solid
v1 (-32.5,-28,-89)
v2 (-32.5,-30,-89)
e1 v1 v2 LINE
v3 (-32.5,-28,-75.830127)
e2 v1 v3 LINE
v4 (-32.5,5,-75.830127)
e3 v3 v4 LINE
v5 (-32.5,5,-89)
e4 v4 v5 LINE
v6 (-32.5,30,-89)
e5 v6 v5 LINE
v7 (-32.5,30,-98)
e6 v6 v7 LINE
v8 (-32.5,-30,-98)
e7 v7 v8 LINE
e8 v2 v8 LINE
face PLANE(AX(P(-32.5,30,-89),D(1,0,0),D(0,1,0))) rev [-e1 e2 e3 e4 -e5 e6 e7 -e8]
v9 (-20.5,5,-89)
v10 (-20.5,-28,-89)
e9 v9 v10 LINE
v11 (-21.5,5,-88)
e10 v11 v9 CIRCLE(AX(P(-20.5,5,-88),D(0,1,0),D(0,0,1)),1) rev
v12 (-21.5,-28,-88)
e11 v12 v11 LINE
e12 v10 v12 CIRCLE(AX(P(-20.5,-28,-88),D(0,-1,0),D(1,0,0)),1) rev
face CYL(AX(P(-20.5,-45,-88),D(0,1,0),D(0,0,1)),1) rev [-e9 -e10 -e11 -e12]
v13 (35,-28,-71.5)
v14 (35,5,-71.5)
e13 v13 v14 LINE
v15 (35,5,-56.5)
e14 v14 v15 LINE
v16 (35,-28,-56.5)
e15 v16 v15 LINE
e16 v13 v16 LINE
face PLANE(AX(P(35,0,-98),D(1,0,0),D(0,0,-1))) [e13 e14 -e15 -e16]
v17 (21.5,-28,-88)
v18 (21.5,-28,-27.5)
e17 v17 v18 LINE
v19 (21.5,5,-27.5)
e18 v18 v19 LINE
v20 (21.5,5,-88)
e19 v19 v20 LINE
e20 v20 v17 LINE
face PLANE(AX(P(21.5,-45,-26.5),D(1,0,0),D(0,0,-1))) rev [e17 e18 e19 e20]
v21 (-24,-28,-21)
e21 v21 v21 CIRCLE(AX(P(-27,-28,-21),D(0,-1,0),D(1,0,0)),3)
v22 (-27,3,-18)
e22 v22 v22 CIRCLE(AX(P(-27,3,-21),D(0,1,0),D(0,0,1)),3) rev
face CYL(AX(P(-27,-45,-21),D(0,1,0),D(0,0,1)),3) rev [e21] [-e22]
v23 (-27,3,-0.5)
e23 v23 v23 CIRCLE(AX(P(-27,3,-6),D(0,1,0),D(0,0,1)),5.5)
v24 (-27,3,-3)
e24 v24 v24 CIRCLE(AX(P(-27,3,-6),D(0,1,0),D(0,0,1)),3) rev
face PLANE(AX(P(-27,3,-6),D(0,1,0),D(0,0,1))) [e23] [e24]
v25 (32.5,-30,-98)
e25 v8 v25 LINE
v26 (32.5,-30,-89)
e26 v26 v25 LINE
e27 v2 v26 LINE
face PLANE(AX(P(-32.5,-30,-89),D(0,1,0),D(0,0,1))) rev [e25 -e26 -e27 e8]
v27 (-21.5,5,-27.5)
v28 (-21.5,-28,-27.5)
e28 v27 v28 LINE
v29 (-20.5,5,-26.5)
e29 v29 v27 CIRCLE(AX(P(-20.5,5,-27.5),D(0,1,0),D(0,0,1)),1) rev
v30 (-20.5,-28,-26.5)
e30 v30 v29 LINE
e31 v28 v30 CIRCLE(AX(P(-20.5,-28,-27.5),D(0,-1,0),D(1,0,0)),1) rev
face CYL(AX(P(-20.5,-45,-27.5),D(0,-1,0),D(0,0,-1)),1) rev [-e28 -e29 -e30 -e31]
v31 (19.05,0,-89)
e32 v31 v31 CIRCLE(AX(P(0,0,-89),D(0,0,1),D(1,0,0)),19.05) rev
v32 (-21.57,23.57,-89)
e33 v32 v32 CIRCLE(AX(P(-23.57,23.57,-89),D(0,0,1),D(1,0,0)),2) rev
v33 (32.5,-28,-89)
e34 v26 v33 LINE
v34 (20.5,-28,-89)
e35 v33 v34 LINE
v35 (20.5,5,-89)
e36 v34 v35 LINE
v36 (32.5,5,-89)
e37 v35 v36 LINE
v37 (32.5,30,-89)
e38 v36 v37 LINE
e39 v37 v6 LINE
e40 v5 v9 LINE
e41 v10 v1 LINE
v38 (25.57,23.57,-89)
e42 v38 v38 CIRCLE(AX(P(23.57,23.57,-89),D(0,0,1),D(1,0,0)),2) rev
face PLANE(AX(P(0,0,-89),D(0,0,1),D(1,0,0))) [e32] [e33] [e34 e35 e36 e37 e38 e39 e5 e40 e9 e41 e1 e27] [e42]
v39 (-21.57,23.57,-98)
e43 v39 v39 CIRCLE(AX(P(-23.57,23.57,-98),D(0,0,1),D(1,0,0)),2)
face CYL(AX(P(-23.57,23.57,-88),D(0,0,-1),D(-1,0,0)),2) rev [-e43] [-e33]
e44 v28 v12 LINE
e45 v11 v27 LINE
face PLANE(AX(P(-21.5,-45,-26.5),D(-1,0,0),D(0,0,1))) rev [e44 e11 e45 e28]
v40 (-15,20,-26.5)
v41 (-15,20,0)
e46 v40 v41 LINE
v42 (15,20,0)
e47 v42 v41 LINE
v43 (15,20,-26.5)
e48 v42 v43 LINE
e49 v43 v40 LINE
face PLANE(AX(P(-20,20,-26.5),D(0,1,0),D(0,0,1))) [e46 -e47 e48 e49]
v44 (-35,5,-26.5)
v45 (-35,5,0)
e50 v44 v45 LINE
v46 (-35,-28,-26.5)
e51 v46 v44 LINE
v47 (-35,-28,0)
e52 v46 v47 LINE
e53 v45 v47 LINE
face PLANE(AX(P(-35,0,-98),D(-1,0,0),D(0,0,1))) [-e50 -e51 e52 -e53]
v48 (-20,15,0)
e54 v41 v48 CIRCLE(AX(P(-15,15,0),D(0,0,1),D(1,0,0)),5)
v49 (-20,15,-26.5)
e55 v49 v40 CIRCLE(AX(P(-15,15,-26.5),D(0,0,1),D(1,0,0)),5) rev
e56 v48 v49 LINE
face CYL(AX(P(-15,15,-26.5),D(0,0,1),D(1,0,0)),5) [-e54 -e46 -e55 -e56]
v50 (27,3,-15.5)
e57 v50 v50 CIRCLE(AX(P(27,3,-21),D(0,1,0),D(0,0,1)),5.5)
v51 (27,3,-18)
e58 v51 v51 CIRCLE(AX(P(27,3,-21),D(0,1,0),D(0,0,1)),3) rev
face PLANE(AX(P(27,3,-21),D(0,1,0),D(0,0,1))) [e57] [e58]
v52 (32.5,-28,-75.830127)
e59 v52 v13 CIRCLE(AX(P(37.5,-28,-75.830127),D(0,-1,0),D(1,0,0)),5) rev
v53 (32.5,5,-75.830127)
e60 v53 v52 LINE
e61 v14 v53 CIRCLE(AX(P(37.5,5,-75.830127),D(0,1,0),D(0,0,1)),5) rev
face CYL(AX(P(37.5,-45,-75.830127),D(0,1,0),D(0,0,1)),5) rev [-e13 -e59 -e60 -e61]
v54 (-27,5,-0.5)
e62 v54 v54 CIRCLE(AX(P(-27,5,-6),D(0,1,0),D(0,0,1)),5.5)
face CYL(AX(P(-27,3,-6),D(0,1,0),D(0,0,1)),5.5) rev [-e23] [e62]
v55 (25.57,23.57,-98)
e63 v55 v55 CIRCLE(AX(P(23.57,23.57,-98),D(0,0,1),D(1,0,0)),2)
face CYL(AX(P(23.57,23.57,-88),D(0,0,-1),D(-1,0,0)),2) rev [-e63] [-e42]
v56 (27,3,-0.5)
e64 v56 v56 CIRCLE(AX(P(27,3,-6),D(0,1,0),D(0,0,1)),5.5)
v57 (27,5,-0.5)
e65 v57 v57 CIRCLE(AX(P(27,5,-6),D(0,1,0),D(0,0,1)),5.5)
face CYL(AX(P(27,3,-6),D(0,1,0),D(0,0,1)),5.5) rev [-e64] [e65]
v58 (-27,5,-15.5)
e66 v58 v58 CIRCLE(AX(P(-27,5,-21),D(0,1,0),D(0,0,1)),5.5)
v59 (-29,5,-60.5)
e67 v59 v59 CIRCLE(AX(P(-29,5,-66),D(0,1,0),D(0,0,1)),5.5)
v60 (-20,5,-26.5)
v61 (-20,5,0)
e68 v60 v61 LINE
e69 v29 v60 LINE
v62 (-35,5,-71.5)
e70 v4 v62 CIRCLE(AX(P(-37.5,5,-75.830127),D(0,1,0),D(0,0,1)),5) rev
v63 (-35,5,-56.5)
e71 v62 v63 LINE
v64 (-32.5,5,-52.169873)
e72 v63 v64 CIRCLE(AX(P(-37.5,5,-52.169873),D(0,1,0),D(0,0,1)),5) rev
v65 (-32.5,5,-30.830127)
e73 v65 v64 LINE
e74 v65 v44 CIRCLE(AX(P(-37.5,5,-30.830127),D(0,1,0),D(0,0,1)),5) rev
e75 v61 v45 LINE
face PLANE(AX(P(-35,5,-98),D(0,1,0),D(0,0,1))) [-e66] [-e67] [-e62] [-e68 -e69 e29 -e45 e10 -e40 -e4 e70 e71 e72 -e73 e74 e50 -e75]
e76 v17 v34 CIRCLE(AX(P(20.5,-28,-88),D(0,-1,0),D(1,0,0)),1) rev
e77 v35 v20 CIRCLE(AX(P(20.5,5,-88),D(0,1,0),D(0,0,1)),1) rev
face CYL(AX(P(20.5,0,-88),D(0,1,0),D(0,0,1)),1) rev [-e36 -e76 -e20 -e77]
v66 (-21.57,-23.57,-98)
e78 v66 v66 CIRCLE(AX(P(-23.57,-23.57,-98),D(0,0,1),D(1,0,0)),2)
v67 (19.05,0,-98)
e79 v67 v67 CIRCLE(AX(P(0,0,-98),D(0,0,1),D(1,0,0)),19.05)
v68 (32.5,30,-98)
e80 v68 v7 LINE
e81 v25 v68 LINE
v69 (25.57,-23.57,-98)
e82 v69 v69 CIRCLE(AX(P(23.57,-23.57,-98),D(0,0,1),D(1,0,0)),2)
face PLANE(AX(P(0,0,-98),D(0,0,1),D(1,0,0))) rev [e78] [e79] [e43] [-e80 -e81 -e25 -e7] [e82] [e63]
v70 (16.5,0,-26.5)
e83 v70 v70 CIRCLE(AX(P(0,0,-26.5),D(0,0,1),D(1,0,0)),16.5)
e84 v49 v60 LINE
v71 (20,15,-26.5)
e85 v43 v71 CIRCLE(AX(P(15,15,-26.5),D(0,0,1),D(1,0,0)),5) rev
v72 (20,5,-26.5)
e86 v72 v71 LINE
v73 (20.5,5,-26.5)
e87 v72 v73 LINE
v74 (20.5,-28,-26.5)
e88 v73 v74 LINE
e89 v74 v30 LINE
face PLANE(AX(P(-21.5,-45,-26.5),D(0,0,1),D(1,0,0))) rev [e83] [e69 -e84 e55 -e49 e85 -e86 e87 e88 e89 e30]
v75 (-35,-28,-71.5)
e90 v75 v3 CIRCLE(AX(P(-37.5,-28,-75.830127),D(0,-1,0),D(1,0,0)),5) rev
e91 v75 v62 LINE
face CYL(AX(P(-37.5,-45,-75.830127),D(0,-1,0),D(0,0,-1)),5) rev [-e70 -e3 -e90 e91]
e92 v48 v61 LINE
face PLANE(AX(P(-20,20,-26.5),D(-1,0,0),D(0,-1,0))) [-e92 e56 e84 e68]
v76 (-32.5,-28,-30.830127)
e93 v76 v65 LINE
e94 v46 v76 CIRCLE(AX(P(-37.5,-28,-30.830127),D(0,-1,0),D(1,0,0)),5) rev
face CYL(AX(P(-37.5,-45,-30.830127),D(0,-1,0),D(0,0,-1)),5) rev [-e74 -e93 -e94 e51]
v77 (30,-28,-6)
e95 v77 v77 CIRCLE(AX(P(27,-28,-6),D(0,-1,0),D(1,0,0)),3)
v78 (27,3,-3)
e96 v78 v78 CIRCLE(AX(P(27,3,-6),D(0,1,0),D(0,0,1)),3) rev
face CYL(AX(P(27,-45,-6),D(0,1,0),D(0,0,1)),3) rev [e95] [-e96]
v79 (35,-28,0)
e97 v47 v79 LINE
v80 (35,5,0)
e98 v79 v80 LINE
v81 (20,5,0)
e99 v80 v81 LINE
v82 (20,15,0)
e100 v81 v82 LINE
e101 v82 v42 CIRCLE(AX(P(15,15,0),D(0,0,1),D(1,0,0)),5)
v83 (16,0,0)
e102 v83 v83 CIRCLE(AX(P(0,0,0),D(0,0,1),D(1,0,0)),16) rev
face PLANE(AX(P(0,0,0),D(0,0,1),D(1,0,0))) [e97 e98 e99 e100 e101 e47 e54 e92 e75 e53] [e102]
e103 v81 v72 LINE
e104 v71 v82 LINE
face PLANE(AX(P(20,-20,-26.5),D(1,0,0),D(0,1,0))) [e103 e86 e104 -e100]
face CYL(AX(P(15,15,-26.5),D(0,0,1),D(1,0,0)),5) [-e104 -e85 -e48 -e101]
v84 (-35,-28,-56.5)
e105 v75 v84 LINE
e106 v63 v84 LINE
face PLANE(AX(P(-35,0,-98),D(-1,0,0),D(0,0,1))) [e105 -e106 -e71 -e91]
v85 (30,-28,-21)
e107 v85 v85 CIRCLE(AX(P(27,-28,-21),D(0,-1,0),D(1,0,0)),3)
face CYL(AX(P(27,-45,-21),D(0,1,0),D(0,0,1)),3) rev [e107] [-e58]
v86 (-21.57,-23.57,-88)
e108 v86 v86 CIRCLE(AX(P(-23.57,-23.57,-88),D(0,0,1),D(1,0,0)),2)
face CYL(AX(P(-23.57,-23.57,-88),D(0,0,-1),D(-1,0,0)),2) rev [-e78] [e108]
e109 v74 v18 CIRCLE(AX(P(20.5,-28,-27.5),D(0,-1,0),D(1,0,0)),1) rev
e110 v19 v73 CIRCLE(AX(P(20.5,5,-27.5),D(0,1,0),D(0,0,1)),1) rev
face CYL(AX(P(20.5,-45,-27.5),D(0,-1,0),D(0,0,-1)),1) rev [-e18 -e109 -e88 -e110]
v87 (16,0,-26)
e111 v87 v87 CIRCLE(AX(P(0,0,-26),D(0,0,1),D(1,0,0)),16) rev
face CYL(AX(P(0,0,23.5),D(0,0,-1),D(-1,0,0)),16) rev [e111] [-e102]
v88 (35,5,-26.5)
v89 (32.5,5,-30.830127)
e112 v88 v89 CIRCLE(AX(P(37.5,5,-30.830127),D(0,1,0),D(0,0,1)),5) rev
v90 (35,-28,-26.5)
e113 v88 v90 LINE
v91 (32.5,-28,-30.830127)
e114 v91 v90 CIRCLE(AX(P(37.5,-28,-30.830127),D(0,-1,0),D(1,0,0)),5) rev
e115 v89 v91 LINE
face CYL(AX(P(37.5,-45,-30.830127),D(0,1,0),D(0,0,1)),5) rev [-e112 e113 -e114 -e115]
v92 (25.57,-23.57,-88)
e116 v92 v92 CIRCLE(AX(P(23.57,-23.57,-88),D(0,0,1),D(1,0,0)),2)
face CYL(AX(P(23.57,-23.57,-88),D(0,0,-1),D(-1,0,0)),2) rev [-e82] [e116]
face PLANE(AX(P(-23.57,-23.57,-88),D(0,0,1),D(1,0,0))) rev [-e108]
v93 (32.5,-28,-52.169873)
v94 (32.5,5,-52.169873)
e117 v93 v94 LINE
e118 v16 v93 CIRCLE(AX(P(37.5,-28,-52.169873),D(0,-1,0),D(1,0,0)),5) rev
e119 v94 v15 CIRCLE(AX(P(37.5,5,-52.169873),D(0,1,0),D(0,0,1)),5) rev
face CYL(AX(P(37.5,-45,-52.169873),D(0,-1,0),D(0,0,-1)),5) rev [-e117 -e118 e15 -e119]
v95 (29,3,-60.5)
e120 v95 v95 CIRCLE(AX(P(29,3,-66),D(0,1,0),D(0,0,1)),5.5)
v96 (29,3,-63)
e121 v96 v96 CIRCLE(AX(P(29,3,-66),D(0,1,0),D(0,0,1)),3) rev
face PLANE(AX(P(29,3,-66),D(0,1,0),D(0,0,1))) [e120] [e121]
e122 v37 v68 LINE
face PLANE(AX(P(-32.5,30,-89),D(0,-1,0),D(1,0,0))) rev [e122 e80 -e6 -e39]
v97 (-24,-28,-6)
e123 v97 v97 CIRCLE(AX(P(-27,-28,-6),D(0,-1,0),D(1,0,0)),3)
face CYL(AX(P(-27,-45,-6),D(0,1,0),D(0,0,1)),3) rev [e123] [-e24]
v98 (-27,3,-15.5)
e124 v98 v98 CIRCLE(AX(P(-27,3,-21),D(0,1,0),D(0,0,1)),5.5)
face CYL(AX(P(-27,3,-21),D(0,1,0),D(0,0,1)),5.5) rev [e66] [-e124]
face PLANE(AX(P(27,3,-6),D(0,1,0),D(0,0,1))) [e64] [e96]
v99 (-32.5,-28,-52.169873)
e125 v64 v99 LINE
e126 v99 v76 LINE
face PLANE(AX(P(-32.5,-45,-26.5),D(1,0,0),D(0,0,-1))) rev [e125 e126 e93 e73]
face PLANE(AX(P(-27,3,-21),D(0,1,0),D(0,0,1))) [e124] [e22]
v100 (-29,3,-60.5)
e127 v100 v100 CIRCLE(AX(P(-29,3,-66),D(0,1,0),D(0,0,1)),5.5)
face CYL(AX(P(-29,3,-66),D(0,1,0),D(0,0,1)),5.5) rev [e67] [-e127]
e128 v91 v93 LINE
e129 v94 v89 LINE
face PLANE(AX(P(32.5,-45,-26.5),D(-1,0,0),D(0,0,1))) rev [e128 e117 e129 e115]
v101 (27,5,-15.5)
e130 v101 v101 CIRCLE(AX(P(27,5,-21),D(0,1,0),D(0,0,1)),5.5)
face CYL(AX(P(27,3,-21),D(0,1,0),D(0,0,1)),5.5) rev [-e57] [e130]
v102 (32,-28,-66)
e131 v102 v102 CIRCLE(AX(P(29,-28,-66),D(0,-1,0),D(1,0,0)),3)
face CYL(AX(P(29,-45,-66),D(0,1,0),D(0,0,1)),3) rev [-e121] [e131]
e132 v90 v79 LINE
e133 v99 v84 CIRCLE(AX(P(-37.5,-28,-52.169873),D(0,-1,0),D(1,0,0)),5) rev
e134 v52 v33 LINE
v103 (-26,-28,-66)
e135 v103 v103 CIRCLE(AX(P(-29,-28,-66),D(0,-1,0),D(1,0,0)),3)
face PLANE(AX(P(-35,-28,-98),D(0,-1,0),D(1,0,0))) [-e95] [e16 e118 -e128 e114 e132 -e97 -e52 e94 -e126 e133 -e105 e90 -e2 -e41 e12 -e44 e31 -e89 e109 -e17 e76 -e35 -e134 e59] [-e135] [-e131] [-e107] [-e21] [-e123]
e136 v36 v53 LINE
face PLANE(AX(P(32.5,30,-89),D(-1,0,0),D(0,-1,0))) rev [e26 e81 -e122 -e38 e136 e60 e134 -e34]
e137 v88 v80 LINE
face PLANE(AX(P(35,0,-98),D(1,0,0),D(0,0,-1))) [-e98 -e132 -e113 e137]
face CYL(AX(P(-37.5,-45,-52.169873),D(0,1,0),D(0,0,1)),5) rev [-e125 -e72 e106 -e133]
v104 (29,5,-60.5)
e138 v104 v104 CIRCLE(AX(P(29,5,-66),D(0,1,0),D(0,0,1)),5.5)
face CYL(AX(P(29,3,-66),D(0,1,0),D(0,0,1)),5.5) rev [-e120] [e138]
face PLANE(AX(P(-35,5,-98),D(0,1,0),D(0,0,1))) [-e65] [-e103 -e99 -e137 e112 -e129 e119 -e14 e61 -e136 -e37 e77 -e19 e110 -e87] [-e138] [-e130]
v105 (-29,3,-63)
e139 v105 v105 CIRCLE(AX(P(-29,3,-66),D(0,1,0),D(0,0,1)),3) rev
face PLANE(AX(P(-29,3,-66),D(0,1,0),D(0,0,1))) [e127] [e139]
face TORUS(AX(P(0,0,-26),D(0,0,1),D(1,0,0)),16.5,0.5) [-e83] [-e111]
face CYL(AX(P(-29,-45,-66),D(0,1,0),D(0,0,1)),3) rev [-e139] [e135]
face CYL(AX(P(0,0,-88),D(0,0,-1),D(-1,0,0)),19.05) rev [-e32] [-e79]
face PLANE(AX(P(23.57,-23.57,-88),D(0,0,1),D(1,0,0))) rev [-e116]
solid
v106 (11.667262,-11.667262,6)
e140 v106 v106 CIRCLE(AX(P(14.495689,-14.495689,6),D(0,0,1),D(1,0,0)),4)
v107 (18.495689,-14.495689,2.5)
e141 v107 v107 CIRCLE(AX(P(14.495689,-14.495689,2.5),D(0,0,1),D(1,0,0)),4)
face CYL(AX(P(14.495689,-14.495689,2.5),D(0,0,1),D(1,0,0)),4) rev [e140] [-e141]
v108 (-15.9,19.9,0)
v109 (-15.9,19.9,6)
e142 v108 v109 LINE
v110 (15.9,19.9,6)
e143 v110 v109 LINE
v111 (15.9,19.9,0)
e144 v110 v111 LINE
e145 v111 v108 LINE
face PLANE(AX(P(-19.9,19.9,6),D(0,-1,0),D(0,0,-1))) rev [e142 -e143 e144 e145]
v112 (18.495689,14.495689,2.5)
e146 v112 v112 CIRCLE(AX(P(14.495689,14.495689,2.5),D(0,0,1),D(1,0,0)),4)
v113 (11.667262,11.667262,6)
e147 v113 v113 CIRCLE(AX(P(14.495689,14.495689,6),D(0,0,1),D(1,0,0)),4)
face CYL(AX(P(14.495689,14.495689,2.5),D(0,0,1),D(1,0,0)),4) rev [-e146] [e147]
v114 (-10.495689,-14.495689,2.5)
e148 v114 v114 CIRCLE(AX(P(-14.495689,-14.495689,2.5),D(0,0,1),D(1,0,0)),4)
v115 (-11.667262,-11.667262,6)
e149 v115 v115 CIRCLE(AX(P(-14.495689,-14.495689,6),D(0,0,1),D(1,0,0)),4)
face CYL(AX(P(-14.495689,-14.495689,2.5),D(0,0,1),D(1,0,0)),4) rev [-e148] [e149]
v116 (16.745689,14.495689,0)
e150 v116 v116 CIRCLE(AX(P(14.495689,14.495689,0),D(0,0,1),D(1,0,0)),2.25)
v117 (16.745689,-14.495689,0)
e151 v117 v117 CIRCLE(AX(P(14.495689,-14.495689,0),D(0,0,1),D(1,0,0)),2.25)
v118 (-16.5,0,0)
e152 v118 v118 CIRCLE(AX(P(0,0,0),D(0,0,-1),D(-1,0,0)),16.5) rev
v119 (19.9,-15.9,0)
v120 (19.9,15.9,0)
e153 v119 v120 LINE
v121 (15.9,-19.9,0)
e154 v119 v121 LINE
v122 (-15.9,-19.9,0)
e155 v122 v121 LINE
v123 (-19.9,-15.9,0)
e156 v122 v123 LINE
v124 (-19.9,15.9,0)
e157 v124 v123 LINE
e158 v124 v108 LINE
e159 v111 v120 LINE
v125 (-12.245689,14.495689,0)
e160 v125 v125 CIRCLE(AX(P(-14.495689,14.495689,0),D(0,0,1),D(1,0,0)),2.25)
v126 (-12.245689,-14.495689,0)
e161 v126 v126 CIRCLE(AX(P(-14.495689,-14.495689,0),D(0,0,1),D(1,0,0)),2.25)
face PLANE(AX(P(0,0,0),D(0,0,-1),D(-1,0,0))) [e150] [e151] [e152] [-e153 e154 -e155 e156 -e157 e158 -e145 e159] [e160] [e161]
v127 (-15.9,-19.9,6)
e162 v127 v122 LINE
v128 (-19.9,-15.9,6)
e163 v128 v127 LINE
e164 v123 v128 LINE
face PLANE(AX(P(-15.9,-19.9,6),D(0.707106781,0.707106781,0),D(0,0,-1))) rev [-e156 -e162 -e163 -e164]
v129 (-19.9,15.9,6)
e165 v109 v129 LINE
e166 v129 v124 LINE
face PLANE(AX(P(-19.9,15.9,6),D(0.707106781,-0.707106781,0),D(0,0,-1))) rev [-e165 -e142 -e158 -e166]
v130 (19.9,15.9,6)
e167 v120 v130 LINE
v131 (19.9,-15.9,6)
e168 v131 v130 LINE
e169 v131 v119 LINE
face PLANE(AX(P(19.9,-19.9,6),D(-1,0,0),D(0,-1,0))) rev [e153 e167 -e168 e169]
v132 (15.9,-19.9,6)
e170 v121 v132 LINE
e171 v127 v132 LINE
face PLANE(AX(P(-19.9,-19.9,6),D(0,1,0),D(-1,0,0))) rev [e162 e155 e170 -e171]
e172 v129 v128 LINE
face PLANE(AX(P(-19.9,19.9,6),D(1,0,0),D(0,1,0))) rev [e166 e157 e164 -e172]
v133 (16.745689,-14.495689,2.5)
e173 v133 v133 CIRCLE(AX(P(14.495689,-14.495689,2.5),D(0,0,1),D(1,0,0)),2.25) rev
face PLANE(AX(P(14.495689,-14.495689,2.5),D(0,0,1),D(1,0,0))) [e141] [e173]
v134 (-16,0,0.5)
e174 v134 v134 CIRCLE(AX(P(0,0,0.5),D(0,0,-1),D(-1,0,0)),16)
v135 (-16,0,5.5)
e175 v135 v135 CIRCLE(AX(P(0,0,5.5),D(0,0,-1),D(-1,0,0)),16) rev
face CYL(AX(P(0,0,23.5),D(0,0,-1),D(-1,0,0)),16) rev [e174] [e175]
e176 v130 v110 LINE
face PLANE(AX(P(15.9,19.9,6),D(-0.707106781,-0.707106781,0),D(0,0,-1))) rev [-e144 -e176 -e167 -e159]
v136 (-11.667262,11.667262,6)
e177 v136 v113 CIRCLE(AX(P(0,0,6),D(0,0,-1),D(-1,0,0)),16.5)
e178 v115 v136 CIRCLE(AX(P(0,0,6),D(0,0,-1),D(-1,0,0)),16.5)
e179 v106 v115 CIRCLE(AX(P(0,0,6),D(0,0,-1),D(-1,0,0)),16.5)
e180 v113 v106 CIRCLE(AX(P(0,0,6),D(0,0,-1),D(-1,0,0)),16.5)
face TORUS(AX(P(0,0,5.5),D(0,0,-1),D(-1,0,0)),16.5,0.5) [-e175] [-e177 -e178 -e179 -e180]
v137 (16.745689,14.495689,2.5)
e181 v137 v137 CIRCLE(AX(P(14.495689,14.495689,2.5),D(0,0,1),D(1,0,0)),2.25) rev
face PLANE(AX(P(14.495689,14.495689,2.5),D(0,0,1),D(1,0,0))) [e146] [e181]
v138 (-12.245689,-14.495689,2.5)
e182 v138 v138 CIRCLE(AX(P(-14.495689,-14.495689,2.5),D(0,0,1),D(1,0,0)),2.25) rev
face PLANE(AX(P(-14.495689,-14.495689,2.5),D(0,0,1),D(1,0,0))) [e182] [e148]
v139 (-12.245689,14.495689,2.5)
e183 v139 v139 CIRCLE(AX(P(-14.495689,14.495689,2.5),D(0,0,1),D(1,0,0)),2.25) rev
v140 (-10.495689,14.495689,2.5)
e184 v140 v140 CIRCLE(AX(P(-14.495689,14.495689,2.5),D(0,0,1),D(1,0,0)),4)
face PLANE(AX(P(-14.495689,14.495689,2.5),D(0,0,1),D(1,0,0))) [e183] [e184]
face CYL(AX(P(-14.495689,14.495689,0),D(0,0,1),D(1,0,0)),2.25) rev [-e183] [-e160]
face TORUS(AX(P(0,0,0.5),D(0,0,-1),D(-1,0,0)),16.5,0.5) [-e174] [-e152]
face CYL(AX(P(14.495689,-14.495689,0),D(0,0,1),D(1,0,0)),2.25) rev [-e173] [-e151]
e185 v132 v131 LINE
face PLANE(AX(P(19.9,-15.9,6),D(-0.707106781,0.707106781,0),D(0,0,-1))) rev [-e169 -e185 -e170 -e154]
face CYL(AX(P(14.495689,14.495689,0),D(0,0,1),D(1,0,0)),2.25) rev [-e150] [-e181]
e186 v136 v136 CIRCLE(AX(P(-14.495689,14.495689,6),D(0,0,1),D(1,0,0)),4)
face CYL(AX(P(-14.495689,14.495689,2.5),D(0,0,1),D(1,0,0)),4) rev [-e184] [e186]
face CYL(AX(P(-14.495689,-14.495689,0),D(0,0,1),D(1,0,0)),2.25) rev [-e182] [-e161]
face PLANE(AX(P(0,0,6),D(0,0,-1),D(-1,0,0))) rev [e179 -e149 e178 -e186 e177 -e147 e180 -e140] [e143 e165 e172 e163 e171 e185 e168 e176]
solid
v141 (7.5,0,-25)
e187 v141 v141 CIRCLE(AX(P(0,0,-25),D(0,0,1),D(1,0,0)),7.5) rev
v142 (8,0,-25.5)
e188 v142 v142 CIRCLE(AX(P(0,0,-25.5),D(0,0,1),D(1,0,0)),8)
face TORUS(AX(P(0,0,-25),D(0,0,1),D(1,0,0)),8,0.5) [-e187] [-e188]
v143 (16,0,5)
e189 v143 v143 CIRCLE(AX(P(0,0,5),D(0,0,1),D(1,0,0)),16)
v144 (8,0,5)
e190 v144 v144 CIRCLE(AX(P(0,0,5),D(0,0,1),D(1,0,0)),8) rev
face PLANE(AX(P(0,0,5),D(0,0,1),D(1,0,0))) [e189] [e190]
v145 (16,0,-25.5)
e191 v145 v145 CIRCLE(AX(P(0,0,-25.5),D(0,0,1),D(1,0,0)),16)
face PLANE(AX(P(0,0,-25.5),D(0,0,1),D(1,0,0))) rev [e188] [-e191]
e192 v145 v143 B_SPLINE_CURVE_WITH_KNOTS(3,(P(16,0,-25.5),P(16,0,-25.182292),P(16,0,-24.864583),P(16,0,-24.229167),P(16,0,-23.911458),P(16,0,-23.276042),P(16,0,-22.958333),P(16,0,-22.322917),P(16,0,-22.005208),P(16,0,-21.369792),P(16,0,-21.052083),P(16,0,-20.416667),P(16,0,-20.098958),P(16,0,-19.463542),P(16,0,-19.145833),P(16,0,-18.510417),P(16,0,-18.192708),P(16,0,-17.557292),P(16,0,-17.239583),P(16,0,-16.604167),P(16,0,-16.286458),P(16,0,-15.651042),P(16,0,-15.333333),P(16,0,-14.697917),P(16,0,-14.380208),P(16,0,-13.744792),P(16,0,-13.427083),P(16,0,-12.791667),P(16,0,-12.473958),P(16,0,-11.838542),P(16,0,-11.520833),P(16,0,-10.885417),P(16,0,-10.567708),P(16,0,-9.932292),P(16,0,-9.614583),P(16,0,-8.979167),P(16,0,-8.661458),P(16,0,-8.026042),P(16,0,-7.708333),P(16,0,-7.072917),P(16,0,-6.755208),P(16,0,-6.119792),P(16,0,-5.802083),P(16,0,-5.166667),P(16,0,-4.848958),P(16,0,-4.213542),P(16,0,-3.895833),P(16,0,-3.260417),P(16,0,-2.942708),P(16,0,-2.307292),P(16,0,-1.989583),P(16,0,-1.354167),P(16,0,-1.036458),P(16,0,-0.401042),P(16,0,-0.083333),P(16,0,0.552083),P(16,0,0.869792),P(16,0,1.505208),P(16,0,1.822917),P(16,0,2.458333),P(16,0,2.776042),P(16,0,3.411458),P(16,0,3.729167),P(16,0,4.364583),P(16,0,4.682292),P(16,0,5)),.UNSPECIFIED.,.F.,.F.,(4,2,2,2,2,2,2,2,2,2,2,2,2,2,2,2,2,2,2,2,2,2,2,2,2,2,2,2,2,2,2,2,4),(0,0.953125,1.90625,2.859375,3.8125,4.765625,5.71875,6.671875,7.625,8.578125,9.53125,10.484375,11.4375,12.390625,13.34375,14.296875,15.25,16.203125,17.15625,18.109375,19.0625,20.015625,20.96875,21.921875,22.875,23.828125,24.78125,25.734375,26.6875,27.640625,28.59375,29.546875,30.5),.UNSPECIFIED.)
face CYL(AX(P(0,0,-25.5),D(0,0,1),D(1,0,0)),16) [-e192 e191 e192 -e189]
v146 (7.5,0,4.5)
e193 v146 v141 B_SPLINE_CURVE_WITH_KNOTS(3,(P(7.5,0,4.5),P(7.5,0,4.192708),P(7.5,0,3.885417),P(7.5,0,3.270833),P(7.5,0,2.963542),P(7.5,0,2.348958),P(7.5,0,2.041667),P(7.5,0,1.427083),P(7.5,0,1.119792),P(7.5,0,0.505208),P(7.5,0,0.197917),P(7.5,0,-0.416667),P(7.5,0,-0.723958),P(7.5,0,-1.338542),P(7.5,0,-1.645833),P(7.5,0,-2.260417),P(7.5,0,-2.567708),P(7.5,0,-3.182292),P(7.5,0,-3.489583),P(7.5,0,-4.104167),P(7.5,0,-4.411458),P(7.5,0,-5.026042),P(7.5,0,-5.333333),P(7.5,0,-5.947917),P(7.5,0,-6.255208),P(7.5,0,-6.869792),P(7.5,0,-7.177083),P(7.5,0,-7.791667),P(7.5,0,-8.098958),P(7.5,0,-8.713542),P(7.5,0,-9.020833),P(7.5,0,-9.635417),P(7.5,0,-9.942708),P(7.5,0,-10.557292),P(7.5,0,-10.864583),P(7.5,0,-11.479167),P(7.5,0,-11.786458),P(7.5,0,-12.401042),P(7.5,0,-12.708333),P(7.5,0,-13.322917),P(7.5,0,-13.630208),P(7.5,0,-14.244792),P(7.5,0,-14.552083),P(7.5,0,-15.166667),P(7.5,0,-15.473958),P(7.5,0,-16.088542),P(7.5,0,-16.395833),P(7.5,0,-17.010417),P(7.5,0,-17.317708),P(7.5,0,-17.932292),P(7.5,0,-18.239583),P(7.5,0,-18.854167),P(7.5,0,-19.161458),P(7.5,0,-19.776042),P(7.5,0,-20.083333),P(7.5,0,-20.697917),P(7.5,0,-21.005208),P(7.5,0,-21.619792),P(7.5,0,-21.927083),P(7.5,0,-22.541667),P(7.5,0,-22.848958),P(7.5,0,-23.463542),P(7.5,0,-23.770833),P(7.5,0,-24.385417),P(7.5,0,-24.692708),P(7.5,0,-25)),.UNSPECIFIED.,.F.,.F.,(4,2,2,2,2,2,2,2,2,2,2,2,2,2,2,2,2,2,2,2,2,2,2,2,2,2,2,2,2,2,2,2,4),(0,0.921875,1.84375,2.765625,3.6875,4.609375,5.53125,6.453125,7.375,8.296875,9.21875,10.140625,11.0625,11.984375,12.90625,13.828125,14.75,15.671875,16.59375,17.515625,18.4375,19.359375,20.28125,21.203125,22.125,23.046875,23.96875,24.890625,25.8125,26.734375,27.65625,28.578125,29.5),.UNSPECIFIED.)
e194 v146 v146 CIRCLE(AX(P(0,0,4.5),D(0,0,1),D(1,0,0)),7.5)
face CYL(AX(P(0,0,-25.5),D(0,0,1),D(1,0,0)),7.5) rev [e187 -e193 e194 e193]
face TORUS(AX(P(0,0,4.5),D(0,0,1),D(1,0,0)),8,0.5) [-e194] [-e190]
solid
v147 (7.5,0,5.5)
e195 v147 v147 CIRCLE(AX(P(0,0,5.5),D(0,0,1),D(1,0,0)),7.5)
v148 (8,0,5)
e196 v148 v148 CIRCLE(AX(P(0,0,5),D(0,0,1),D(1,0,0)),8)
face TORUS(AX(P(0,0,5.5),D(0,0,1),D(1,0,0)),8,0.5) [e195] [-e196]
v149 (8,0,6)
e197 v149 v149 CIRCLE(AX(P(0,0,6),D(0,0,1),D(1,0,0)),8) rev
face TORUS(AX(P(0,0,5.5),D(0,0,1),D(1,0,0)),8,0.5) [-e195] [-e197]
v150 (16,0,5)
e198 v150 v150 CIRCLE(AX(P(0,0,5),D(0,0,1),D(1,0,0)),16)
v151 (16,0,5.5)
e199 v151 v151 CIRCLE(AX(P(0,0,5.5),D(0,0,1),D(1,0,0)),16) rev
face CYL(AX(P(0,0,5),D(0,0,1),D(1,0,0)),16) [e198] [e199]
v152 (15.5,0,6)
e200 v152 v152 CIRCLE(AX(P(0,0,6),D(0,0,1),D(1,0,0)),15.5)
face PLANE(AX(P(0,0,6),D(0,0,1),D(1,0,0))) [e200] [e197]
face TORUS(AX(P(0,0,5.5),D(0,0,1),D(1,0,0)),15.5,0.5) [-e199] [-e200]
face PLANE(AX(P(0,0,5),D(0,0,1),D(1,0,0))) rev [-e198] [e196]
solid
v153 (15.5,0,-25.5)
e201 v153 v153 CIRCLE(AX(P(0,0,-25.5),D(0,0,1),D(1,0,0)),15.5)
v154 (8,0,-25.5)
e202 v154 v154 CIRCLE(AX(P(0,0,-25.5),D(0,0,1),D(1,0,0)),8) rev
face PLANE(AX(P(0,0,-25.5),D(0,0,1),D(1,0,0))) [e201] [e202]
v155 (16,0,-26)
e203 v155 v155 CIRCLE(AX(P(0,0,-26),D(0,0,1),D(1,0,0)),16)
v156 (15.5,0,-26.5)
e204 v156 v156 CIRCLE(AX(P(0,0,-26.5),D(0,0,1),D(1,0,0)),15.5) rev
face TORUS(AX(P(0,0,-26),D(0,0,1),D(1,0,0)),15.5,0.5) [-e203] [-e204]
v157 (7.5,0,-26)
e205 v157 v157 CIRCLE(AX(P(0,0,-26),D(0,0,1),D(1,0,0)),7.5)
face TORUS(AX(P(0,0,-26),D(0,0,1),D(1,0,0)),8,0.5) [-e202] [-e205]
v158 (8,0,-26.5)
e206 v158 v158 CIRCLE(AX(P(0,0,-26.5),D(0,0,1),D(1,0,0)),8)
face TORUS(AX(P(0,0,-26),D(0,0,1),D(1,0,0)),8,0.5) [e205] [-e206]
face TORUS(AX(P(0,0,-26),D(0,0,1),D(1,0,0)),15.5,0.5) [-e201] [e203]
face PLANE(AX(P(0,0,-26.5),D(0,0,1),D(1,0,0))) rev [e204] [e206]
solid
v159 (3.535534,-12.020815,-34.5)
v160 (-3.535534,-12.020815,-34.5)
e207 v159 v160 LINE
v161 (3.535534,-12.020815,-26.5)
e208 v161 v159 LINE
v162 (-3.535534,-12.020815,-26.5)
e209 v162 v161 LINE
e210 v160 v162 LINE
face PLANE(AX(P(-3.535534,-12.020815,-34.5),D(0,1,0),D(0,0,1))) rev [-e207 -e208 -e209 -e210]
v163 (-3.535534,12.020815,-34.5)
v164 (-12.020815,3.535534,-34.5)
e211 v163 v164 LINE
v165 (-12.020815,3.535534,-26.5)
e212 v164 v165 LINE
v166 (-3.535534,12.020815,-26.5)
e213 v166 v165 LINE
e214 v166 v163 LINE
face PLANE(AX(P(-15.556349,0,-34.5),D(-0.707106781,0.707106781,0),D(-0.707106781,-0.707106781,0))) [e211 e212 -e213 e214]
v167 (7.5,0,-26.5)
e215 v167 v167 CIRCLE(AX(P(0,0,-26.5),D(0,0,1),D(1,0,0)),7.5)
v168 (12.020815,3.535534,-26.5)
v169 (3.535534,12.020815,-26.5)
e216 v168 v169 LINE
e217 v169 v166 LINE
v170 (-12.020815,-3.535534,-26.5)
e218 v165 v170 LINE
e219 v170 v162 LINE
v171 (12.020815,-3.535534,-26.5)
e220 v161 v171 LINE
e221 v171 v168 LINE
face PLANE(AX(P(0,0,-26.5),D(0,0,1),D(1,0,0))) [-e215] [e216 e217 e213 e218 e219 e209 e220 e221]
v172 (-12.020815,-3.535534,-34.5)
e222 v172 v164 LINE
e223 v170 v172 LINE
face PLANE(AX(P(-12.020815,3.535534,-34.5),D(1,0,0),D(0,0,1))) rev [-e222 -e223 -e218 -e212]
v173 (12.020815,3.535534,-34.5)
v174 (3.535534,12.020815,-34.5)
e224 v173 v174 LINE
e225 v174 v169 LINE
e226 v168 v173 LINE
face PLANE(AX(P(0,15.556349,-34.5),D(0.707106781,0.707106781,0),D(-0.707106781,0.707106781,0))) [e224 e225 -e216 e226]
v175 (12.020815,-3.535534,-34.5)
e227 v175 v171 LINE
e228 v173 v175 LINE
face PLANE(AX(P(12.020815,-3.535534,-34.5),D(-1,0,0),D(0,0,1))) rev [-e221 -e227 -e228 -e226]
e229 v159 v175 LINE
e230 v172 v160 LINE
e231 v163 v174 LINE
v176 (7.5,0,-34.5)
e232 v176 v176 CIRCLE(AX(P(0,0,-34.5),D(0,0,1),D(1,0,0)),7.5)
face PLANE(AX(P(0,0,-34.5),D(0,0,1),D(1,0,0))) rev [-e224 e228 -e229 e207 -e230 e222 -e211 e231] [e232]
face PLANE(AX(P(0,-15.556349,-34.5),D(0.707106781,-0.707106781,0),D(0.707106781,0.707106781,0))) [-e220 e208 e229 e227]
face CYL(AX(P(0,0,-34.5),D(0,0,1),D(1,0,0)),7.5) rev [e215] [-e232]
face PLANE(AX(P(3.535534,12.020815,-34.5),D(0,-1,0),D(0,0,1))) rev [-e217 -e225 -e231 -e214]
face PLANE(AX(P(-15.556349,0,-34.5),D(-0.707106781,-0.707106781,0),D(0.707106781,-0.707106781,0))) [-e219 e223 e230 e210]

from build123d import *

# Parameters (mm, degrees)
BOSS_EXTRUDE1_DEPTH = 98
SKETCH2_R           = 3
CUT_EXTRUDE1_DEPTH  = 50
SKETCH3_R           = 5.5
CUT_EXTRUDE3_DEPTH  = 2
SKETCH4_W           = 65
SKETCH4_H           = 60
BOSS_EXTRUDE3_DEPTH = 9
SKETCH5_W           = 43
SKETCH5_H           = 62.5
CUT_EXTRUDE4_DEPTH  = 50
SKETCH6_W           = 40
SKETCH6_H           = 40
BOSS_EXTRUDE4_DEPTH = 26.5
SKETCH7_W           = 2.5
SKETCH7_H           = 26.5
SKETCH7_H_2         = 30
CUT_EXTRUDE5_DEPTH  = 50
FILLET1_R           = 5
SKETCH8_R           = 19.05
CUT_EXTRUDE6_DEPTH  = 10
SKETCH9_W           = 39.8
SKETCH9_H           = 39.8
BOSS_EXTRUDE5_DEPTH = 6
SKETCH10_R          = 16
CUT_EXTRUDE7_DEPTH  = 50
FILLET2_R           = 1
FILLET4_R           = 0.5
SKETCH11_R          = 16
SKETCH11_R_2        = 7.5
BOSS_EXTRUDE6_DEPTH = 1
SKETCH12_R          = 16
SKETCH12_R_2        = 7.5
BOSS_EXTRUDE7_DEPTH = 1
FILLET5_R           = 0.5
FILLET6_R           = 0.5
FILLET7_R           = 0.5
SKETCH13_R          = 16
SKETCH13_R_2        = 7.5
BOSS_EXTRUDE8_DEPTH = 30.5
FILLET8_R           = 0.5
SKETCH14_R          = 7.5
BOSS_EXTRUDE9_DEPTH = 8
CHAMFER1_SIZE       = 5
FILLET9_R           = 5
CHAMFER2_SIZE       = 4
SKETCH15_R          = 2
CUT_EXTRUDE8_DEPTH  = 10
SKETCH16_R          = 2.25
CUT_EXTRUDE9_DEPTH  = 6
SKETCH19_R          = 4
CUT_EXTRUDE10_DEPTH = 3.5


# Some blends are built 0.0001 mm under size
with BuildPart() as part:
    # Sketch1 → Boss-Extrude1 (new body)
    with BuildSketch(Plane.XY):
        Polygon((-35, -28), (35, -28), (35, 0), (35, 5), (-35, 5), (-35, 0), align=None)
    extrude(amount=-BOSS_EXTRUDE1_DEPTH)

    # Sketch2 → Cut-Extrude1 (cut)
    with BuildSketch(Plane(origin=(0, 5, 0), x_dir=(1, 0, 0), z_dir=(0, 1, 0))):
        with Locations(Location((-29, 66, 0), (0, 0, 270))):
            Circle(SKETCH2_R)
        with Locations(Location((29, 66, 0), (0, 0, 270))):
            Circle(SKETCH2_R)
        with Locations(Location((-27, 21, 0), (0, 0, 270))):
            Circle(SKETCH2_R)
        with Locations(Location((-27, 6, 0), (0, 0, 270))):
            Circle(SKETCH2_R)
        with Locations(Location((27, 21, 0), (0, 0, 270))):
            Circle(SKETCH2_R)
        with Locations(Location((27, 6, 0), (0, 0, 270))):
            Circle(SKETCH2_R)
    extrude(amount=-CUT_EXTRUDE1_DEPTH, mode=Mode.SUBTRACT)

    # Sketch3 → Cut-Extrude3 (cut)
    with BuildSketch(Plane(origin=(0, 5, 0), x_dir=(1, 0, 0), z_dir=(0, 1, 0))):
        with Locations(Location((-29, 66, 0), (0, 0, 270))):
            Circle(SKETCH3_R)
        with Locations(Location((29, 66, 0), (0, 0, 270))):
            Circle(SKETCH3_R)
        with Locations(Location((-27, 21, 0), (0, 0, 270))):
            Circle(SKETCH3_R)
        with Locations(Location((-27, 6, 0), (0, 0, 270))):
            Circle(SKETCH3_R)
        with Locations(Location((27, 21, 0), (0, 0, 270))):
            Circle(SKETCH3_R)
        with Locations(Location((27, 6, 0), (0, 0, 270))):
            Circle(SKETCH3_R)
    extrude(amount=-CUT_EXTRUDE3_DEPTH, mode=Mode.SUBTRACT)

    # Sketch4 → Boss-Extrude3 (add)
    with BuildSketch(Plane.XY.offset(-98)):
        Rectangle(SKETCH4_W, SKETCH4_H)
    extrude(amount=BOSS_EXTRUDE3_DEPTH)

    # Sketch5 → Cut-Extrude4 (cut)
    with BuildSketch(Plane(origin=(0, 5, 0), x_dir=(1, 0, 0), z_dir=(0, 1, 0))):
        with Locations((0, 57.75)):
            Rectangle(SKETCH5_W, SKETCH5_H)
    extrude(amount=-CUT_EXTRUDE4_DEPTH, mode=Mode.SUBTRACT)

    # Sketch6 → Boss-Extrude4 (add)
    with BuildSketch(Plane.XY):
        Rectangle(SKETCH6_W, SKETCH6_H)
    extrude(amount=-BOSS_EXTRUDE4_DEPTH)

    # Sketch7 → Cut-Extrude5 (cut)
    with BuildSketch(Plane(origin=(0, 5, 0), x_dir=(1, 0, 0), z_dir=(0, 1, 0))):
        with Locations((33.75, 84.75)):
            Rectangle(SKETCH7_W, SKETCH7_H)
        with Locations((-33.75, 84.75)):
            Rectangle(SKETCH7_W, SKETCH7_H)
        with Locations((33.75, 41.5)):
            Rectangle(SKETCH7_W, SKETCH7_H_2)
        with Locations((-33.75, 41.5)):
            Rectangle(SKETCH7_W, SKETCH7_H_2)
    extrude(amount=-CUT_EXTRUDE5_DEPTH, mode=Mode.SUBTRACT)

    # Fillet1
    # the kernel refuses this fillet: 5 mm, written as the material it adds along each edge
    with BuildSketch(Plane(origin=(32.5, 5, -71.5), x_dir=(0, 0, -1), z_dir=(0, -1, 0)), Plane(origin=(32.5, 5, -26.5), x_dir=(0, 0, -1), z_dir=(0, -1, 0)), Plane(origin=(-32.5, 5, -56.5), x_dir=(0, 0, 1), z_dir=(0, -1, 0))) as fillet1_piece_1:
        with BuildLine():
            CenterArc((4.330127019, 5), FILLET1_R, 210, 60)
            Line((0, 2.5), (-0.08660254, 2.45))
            ThreePointArc((-0.08660254, 2.45), (-0.1, 1.25), (-0.1, 0))
            Line((-0.1, 0), (0, -0.1))
            Line((0, -0.1), (4.330127019, -0.1))
            Line((4.330127019, -0.1), (4.330127019, 0))
        make_face()
    extrude(amount=33)
    with BuildSketch(Plane(origin=(32.5, 5, -56.5), x_dir=(1, 0, 0), z_dir=(0, -1, 0)), Plane(origin=(-32.5, 5, -26.5), x_dir=(-1, 0, 0), z_dir=(0, -1, 0)), Plane(origin=(-32.5, 5, -71.5), x_dir=(-1, 0, 0), z_dir=(0, -1, 0))) as fillet1_piece_2:
        with BuildLine():
            CenterArc((5, 4.330127019), FILLET1_R, 180, 60)
            Line((0, 4.330127019), (-0.1, 4.330127019))
            Line((-0.1, 4.330127019), (-0.1, 0))
            Line((-0.1, 0), (0, -0.1))
            ThreePointArc((0, -0.1), (1.25, -0.1), (2.45, -0.08660254))
            Line((2.45, -0.08660254), (2.5, 0))
        make_face()
    extrude(amount=33)

    # Sketch8 → Cut-Extrude6 (cut)
    with BuildSketch(Plane.XY.offset(-98)):
        Circle(SKETCH8_R)
    extrude(amount=CUT_EXTRUDE6_DEPTH, mode=Mode.SUBTRACT)


with BuildPart() as body_2:
    # Sketch9 → Boss-Extrude5 (new body)
    with BuildSketch(Plane.XY):
        Rectangle(SKETCH9_W, SKETCH9_H)
    extrude(amount=BOSS_EXTRUDE5_DEPTH)


with BuildPart() as cut_extrude7_tool:
    # Sketch10 → Cut-Extrude7 (new body)
    with BuildSketch(Plane.XY.offset(-26.5)):
        with Locations(Location((0, 0, 0), (0, 0, 180))):
            Circle(SKETCH10_R)
    extrude(amount=CUT_EXTRUDE7_DEPTH)


with BuildPart() as part_1:
    add(part.part)

    # Cut-Extrude7: cut by cut_extrude7_tool
    add(cut_extrude7_tool.part, mode=Mode.SUBTRACT)

    # Fillet2
    fillet2_edges = [part_1.edges().sort_by_distance(p)[0] for p in [
        (-21.5, -11.5, -89),
        (21.5, -11.5, -89),
        (21.5, -11.5, -26.5),
        (-21.5, -11.5, -26.5),
    ]]
    fillet(fillet2_edges, radius=FILLET2_R)

    # Fillet6
    fillet6_edges = [part_1.edges().sort_by_distance(p)[0] for p in [
        (16, 0, -26.5),
    ]]
    fillet(fillet6_edges, radius=FILLET6_R)

    # Fillet9
    fillet9_edges = [part_1.edges().sort_by_distance(p)[0] for p in [
        (20, 20, -13.25),
        (-20, 20, -13.25),
    ]]
    fillet(fillet9_edges, radius=FILLET9_R)

    # Sketch15 → Cut-Extrude8 (cut)
    with BuildSketch(Plane.XY.offset(-98)):
        with Locations((-23.57, 23.57)):
            Circle(SKETCH15_R)
        with Locations((-23.57, -23.57)):
            Circle(SKETCH15_R)
        with Locations((23.57, -23.57)):
            Circle(SKETCH15_R)
        with Locations((23.57, 23.57)):
            Circle(SKETCH15_R)
    extrude(amount=CUT_EXTRUDE8_DEPTH, mode=Mode.SUBTRACT)


with BuildPart() as body_2_1:
    add(body_2.part)

    # Cut-Extrude7: cut by cut_extrude7_tool
    add(cut_extrude7_tool.part, mode=Mode.SUBTRACT)

    # Fillet4
    fillet4_edges = [body_2_1.edges().sort_by_distance(p)[0] for p in [
        (16, 0, 0),
        (16, 0, 6),
    ]]
    fillet(fillet4_edges, radius=FILLET4_R)

    # Chamfer2
    chamfer2_edges = [body_2_1.edges().sort_by_distance(p)[0] for p in [
        (19.9, -19.9, 3),
        (-19.9, -19.9, 3),
        (-19.9, 19.9, 3),
        (19.9, 19.9, 3),
    ]]
    chamfer(chamfer2_edges, length=CHAMFER2_SIZE)

    # Sketch16 → Cut-Extrude9 (cut)
    with BuildSketch(Plane.XY.offset(6)):
        with Locations((14.495689014, 14.495689014)):
            Circle(SKETCH16_R)
        with Locations((-14.495689014, 14.495689014)):
            Circle(SKETCH16_R)
        with Locations((-14.495689014, -14.495689014)):
            Circle(SKETCH16_R)
        with Locations((14.495689014, -14.495689014)):
            Circle(SKETCH16_R)
    extrude(amount=-CUT_EXTRUDE9_DEPTH, mode=Mode.SUBTRACT)

    # Sketch19 → Cut-Extrude10 (cut)
    with BuildSketch(Plane.XY.offset(6)):
        with Locations((-14.495689014, 14.495689014)):
            Circle(SKETCH19_R)
        with Locations((14.495689014, 14.495689014)):
            Circle(SKETCH19_R)
        with Locations((14.495689014, -14.495689014)):
            Circle(SKETCH19_R)
        with Locations((-14.495689014, -14.495689014)):
            Circle(SKETCH19_R)
    extrude(amount=-CUT_EXTRUDE10_DEPTH, mode=Mode.SUBTRACT)


with BuildPart() as body_3:
    # Sketch11 → Boss-Extrude6 (new body)
    with BuildSketch(Plane.XY.offset(6)):
        Circle(SKETCH11_R)
        Circle(SKETCH11_R_2, mode=Mode.SUBTRACT)
    extrude(amount=-BOSS_EXTRUDE6_DEPTH)

    # Fillet5
    fillet5_edges = [body_3.edges().sort_by_distance(p)[0] for p in [
        (-16, 0, 6),
        (-7.5, 0, 5),
        (-7.5, 0, 6),
    ]]
    fillet(fillet5_edges, radius=FILLET5_R - 0.0001)  # a hair under: the kernel refuses the full size


with BuildPart() as body_4:
    # Sketch12 → Boss-Extrude7 (new body)
    with BuildSketch(Plane.XY.offset(-26.5)):
        Circle(SKETCH12_R)
        Circle(SKETCH12_R_2, mode=Mode.SUBTRACT)
    extrude(amount=BOSS_EXTRUDE7_DEPTH)

    # Fillet7
    fillet7_edges = [body_4.edges().sort_by_distance(p)[0] for p in [
        (-16, 0, -26.5),
        (-16, 0, -25.5),
        (-7.5, 0, -26.5),
        (-7.5, 0, -25.5),
    ]]
    fillet(fillet7_edges, radius=FILLET7_R - 0.0001)  # a hair under: the kernel refuses the full size


with BuildPart() as body_5:
    # Sketch13 → Boss-Extrude8 (new body)
    with BuildSketch(Plane.XY.offset(5)):
        Circle(SKETCH13_R)
        Circle(SKETCH13_R_2, mode=Mode.SUBTRACT)
    extrude(amount=-BOSS_EXTRUDE8_DEPTH)

    # Fillet8
    fillet8_edges = [body_5.edges().sort_by_distance(p)[0] for p in [
        (-7.5, 0, -25.5),
        (-7.5, 0, 5),
    ]]
    fillet(fillet8_edges, radius=FILLET8_R)


with BuildPart() as body_6:
    # Sketch14 → Boss-Extrude9 (new body)
    with BuildSketch(Plane.XY.offset(-26.5)):
        Polygon((-15.556349186, 0), (0, 15.556349186), (15.556349186, 0), (0, -15.556349186), align=None)
        Circle(SKETCH14_R, mode=Mode.SUBTRACT)
    extrude(amount=-BOSS_EXTRUDE9_DEPTH)

    # Chamfer1
    chamfer1_edges = [body_6.edges().sort_by_distance(p)[0] for p in [
        (-15.556349186, 0, -30.5),
        (0, 15.556349186, -30.5),
        (15.556349186, 0, -30.5),
        (0, -15.556349186, -30.5),
    ]]
    chamfer(chamfer1_edges, length=CHAMFER1_SIZE)


solid = Compound([part_1.part, body_2_1.part, body_3.part, body_4.part, body_5.part, body_6.part])
